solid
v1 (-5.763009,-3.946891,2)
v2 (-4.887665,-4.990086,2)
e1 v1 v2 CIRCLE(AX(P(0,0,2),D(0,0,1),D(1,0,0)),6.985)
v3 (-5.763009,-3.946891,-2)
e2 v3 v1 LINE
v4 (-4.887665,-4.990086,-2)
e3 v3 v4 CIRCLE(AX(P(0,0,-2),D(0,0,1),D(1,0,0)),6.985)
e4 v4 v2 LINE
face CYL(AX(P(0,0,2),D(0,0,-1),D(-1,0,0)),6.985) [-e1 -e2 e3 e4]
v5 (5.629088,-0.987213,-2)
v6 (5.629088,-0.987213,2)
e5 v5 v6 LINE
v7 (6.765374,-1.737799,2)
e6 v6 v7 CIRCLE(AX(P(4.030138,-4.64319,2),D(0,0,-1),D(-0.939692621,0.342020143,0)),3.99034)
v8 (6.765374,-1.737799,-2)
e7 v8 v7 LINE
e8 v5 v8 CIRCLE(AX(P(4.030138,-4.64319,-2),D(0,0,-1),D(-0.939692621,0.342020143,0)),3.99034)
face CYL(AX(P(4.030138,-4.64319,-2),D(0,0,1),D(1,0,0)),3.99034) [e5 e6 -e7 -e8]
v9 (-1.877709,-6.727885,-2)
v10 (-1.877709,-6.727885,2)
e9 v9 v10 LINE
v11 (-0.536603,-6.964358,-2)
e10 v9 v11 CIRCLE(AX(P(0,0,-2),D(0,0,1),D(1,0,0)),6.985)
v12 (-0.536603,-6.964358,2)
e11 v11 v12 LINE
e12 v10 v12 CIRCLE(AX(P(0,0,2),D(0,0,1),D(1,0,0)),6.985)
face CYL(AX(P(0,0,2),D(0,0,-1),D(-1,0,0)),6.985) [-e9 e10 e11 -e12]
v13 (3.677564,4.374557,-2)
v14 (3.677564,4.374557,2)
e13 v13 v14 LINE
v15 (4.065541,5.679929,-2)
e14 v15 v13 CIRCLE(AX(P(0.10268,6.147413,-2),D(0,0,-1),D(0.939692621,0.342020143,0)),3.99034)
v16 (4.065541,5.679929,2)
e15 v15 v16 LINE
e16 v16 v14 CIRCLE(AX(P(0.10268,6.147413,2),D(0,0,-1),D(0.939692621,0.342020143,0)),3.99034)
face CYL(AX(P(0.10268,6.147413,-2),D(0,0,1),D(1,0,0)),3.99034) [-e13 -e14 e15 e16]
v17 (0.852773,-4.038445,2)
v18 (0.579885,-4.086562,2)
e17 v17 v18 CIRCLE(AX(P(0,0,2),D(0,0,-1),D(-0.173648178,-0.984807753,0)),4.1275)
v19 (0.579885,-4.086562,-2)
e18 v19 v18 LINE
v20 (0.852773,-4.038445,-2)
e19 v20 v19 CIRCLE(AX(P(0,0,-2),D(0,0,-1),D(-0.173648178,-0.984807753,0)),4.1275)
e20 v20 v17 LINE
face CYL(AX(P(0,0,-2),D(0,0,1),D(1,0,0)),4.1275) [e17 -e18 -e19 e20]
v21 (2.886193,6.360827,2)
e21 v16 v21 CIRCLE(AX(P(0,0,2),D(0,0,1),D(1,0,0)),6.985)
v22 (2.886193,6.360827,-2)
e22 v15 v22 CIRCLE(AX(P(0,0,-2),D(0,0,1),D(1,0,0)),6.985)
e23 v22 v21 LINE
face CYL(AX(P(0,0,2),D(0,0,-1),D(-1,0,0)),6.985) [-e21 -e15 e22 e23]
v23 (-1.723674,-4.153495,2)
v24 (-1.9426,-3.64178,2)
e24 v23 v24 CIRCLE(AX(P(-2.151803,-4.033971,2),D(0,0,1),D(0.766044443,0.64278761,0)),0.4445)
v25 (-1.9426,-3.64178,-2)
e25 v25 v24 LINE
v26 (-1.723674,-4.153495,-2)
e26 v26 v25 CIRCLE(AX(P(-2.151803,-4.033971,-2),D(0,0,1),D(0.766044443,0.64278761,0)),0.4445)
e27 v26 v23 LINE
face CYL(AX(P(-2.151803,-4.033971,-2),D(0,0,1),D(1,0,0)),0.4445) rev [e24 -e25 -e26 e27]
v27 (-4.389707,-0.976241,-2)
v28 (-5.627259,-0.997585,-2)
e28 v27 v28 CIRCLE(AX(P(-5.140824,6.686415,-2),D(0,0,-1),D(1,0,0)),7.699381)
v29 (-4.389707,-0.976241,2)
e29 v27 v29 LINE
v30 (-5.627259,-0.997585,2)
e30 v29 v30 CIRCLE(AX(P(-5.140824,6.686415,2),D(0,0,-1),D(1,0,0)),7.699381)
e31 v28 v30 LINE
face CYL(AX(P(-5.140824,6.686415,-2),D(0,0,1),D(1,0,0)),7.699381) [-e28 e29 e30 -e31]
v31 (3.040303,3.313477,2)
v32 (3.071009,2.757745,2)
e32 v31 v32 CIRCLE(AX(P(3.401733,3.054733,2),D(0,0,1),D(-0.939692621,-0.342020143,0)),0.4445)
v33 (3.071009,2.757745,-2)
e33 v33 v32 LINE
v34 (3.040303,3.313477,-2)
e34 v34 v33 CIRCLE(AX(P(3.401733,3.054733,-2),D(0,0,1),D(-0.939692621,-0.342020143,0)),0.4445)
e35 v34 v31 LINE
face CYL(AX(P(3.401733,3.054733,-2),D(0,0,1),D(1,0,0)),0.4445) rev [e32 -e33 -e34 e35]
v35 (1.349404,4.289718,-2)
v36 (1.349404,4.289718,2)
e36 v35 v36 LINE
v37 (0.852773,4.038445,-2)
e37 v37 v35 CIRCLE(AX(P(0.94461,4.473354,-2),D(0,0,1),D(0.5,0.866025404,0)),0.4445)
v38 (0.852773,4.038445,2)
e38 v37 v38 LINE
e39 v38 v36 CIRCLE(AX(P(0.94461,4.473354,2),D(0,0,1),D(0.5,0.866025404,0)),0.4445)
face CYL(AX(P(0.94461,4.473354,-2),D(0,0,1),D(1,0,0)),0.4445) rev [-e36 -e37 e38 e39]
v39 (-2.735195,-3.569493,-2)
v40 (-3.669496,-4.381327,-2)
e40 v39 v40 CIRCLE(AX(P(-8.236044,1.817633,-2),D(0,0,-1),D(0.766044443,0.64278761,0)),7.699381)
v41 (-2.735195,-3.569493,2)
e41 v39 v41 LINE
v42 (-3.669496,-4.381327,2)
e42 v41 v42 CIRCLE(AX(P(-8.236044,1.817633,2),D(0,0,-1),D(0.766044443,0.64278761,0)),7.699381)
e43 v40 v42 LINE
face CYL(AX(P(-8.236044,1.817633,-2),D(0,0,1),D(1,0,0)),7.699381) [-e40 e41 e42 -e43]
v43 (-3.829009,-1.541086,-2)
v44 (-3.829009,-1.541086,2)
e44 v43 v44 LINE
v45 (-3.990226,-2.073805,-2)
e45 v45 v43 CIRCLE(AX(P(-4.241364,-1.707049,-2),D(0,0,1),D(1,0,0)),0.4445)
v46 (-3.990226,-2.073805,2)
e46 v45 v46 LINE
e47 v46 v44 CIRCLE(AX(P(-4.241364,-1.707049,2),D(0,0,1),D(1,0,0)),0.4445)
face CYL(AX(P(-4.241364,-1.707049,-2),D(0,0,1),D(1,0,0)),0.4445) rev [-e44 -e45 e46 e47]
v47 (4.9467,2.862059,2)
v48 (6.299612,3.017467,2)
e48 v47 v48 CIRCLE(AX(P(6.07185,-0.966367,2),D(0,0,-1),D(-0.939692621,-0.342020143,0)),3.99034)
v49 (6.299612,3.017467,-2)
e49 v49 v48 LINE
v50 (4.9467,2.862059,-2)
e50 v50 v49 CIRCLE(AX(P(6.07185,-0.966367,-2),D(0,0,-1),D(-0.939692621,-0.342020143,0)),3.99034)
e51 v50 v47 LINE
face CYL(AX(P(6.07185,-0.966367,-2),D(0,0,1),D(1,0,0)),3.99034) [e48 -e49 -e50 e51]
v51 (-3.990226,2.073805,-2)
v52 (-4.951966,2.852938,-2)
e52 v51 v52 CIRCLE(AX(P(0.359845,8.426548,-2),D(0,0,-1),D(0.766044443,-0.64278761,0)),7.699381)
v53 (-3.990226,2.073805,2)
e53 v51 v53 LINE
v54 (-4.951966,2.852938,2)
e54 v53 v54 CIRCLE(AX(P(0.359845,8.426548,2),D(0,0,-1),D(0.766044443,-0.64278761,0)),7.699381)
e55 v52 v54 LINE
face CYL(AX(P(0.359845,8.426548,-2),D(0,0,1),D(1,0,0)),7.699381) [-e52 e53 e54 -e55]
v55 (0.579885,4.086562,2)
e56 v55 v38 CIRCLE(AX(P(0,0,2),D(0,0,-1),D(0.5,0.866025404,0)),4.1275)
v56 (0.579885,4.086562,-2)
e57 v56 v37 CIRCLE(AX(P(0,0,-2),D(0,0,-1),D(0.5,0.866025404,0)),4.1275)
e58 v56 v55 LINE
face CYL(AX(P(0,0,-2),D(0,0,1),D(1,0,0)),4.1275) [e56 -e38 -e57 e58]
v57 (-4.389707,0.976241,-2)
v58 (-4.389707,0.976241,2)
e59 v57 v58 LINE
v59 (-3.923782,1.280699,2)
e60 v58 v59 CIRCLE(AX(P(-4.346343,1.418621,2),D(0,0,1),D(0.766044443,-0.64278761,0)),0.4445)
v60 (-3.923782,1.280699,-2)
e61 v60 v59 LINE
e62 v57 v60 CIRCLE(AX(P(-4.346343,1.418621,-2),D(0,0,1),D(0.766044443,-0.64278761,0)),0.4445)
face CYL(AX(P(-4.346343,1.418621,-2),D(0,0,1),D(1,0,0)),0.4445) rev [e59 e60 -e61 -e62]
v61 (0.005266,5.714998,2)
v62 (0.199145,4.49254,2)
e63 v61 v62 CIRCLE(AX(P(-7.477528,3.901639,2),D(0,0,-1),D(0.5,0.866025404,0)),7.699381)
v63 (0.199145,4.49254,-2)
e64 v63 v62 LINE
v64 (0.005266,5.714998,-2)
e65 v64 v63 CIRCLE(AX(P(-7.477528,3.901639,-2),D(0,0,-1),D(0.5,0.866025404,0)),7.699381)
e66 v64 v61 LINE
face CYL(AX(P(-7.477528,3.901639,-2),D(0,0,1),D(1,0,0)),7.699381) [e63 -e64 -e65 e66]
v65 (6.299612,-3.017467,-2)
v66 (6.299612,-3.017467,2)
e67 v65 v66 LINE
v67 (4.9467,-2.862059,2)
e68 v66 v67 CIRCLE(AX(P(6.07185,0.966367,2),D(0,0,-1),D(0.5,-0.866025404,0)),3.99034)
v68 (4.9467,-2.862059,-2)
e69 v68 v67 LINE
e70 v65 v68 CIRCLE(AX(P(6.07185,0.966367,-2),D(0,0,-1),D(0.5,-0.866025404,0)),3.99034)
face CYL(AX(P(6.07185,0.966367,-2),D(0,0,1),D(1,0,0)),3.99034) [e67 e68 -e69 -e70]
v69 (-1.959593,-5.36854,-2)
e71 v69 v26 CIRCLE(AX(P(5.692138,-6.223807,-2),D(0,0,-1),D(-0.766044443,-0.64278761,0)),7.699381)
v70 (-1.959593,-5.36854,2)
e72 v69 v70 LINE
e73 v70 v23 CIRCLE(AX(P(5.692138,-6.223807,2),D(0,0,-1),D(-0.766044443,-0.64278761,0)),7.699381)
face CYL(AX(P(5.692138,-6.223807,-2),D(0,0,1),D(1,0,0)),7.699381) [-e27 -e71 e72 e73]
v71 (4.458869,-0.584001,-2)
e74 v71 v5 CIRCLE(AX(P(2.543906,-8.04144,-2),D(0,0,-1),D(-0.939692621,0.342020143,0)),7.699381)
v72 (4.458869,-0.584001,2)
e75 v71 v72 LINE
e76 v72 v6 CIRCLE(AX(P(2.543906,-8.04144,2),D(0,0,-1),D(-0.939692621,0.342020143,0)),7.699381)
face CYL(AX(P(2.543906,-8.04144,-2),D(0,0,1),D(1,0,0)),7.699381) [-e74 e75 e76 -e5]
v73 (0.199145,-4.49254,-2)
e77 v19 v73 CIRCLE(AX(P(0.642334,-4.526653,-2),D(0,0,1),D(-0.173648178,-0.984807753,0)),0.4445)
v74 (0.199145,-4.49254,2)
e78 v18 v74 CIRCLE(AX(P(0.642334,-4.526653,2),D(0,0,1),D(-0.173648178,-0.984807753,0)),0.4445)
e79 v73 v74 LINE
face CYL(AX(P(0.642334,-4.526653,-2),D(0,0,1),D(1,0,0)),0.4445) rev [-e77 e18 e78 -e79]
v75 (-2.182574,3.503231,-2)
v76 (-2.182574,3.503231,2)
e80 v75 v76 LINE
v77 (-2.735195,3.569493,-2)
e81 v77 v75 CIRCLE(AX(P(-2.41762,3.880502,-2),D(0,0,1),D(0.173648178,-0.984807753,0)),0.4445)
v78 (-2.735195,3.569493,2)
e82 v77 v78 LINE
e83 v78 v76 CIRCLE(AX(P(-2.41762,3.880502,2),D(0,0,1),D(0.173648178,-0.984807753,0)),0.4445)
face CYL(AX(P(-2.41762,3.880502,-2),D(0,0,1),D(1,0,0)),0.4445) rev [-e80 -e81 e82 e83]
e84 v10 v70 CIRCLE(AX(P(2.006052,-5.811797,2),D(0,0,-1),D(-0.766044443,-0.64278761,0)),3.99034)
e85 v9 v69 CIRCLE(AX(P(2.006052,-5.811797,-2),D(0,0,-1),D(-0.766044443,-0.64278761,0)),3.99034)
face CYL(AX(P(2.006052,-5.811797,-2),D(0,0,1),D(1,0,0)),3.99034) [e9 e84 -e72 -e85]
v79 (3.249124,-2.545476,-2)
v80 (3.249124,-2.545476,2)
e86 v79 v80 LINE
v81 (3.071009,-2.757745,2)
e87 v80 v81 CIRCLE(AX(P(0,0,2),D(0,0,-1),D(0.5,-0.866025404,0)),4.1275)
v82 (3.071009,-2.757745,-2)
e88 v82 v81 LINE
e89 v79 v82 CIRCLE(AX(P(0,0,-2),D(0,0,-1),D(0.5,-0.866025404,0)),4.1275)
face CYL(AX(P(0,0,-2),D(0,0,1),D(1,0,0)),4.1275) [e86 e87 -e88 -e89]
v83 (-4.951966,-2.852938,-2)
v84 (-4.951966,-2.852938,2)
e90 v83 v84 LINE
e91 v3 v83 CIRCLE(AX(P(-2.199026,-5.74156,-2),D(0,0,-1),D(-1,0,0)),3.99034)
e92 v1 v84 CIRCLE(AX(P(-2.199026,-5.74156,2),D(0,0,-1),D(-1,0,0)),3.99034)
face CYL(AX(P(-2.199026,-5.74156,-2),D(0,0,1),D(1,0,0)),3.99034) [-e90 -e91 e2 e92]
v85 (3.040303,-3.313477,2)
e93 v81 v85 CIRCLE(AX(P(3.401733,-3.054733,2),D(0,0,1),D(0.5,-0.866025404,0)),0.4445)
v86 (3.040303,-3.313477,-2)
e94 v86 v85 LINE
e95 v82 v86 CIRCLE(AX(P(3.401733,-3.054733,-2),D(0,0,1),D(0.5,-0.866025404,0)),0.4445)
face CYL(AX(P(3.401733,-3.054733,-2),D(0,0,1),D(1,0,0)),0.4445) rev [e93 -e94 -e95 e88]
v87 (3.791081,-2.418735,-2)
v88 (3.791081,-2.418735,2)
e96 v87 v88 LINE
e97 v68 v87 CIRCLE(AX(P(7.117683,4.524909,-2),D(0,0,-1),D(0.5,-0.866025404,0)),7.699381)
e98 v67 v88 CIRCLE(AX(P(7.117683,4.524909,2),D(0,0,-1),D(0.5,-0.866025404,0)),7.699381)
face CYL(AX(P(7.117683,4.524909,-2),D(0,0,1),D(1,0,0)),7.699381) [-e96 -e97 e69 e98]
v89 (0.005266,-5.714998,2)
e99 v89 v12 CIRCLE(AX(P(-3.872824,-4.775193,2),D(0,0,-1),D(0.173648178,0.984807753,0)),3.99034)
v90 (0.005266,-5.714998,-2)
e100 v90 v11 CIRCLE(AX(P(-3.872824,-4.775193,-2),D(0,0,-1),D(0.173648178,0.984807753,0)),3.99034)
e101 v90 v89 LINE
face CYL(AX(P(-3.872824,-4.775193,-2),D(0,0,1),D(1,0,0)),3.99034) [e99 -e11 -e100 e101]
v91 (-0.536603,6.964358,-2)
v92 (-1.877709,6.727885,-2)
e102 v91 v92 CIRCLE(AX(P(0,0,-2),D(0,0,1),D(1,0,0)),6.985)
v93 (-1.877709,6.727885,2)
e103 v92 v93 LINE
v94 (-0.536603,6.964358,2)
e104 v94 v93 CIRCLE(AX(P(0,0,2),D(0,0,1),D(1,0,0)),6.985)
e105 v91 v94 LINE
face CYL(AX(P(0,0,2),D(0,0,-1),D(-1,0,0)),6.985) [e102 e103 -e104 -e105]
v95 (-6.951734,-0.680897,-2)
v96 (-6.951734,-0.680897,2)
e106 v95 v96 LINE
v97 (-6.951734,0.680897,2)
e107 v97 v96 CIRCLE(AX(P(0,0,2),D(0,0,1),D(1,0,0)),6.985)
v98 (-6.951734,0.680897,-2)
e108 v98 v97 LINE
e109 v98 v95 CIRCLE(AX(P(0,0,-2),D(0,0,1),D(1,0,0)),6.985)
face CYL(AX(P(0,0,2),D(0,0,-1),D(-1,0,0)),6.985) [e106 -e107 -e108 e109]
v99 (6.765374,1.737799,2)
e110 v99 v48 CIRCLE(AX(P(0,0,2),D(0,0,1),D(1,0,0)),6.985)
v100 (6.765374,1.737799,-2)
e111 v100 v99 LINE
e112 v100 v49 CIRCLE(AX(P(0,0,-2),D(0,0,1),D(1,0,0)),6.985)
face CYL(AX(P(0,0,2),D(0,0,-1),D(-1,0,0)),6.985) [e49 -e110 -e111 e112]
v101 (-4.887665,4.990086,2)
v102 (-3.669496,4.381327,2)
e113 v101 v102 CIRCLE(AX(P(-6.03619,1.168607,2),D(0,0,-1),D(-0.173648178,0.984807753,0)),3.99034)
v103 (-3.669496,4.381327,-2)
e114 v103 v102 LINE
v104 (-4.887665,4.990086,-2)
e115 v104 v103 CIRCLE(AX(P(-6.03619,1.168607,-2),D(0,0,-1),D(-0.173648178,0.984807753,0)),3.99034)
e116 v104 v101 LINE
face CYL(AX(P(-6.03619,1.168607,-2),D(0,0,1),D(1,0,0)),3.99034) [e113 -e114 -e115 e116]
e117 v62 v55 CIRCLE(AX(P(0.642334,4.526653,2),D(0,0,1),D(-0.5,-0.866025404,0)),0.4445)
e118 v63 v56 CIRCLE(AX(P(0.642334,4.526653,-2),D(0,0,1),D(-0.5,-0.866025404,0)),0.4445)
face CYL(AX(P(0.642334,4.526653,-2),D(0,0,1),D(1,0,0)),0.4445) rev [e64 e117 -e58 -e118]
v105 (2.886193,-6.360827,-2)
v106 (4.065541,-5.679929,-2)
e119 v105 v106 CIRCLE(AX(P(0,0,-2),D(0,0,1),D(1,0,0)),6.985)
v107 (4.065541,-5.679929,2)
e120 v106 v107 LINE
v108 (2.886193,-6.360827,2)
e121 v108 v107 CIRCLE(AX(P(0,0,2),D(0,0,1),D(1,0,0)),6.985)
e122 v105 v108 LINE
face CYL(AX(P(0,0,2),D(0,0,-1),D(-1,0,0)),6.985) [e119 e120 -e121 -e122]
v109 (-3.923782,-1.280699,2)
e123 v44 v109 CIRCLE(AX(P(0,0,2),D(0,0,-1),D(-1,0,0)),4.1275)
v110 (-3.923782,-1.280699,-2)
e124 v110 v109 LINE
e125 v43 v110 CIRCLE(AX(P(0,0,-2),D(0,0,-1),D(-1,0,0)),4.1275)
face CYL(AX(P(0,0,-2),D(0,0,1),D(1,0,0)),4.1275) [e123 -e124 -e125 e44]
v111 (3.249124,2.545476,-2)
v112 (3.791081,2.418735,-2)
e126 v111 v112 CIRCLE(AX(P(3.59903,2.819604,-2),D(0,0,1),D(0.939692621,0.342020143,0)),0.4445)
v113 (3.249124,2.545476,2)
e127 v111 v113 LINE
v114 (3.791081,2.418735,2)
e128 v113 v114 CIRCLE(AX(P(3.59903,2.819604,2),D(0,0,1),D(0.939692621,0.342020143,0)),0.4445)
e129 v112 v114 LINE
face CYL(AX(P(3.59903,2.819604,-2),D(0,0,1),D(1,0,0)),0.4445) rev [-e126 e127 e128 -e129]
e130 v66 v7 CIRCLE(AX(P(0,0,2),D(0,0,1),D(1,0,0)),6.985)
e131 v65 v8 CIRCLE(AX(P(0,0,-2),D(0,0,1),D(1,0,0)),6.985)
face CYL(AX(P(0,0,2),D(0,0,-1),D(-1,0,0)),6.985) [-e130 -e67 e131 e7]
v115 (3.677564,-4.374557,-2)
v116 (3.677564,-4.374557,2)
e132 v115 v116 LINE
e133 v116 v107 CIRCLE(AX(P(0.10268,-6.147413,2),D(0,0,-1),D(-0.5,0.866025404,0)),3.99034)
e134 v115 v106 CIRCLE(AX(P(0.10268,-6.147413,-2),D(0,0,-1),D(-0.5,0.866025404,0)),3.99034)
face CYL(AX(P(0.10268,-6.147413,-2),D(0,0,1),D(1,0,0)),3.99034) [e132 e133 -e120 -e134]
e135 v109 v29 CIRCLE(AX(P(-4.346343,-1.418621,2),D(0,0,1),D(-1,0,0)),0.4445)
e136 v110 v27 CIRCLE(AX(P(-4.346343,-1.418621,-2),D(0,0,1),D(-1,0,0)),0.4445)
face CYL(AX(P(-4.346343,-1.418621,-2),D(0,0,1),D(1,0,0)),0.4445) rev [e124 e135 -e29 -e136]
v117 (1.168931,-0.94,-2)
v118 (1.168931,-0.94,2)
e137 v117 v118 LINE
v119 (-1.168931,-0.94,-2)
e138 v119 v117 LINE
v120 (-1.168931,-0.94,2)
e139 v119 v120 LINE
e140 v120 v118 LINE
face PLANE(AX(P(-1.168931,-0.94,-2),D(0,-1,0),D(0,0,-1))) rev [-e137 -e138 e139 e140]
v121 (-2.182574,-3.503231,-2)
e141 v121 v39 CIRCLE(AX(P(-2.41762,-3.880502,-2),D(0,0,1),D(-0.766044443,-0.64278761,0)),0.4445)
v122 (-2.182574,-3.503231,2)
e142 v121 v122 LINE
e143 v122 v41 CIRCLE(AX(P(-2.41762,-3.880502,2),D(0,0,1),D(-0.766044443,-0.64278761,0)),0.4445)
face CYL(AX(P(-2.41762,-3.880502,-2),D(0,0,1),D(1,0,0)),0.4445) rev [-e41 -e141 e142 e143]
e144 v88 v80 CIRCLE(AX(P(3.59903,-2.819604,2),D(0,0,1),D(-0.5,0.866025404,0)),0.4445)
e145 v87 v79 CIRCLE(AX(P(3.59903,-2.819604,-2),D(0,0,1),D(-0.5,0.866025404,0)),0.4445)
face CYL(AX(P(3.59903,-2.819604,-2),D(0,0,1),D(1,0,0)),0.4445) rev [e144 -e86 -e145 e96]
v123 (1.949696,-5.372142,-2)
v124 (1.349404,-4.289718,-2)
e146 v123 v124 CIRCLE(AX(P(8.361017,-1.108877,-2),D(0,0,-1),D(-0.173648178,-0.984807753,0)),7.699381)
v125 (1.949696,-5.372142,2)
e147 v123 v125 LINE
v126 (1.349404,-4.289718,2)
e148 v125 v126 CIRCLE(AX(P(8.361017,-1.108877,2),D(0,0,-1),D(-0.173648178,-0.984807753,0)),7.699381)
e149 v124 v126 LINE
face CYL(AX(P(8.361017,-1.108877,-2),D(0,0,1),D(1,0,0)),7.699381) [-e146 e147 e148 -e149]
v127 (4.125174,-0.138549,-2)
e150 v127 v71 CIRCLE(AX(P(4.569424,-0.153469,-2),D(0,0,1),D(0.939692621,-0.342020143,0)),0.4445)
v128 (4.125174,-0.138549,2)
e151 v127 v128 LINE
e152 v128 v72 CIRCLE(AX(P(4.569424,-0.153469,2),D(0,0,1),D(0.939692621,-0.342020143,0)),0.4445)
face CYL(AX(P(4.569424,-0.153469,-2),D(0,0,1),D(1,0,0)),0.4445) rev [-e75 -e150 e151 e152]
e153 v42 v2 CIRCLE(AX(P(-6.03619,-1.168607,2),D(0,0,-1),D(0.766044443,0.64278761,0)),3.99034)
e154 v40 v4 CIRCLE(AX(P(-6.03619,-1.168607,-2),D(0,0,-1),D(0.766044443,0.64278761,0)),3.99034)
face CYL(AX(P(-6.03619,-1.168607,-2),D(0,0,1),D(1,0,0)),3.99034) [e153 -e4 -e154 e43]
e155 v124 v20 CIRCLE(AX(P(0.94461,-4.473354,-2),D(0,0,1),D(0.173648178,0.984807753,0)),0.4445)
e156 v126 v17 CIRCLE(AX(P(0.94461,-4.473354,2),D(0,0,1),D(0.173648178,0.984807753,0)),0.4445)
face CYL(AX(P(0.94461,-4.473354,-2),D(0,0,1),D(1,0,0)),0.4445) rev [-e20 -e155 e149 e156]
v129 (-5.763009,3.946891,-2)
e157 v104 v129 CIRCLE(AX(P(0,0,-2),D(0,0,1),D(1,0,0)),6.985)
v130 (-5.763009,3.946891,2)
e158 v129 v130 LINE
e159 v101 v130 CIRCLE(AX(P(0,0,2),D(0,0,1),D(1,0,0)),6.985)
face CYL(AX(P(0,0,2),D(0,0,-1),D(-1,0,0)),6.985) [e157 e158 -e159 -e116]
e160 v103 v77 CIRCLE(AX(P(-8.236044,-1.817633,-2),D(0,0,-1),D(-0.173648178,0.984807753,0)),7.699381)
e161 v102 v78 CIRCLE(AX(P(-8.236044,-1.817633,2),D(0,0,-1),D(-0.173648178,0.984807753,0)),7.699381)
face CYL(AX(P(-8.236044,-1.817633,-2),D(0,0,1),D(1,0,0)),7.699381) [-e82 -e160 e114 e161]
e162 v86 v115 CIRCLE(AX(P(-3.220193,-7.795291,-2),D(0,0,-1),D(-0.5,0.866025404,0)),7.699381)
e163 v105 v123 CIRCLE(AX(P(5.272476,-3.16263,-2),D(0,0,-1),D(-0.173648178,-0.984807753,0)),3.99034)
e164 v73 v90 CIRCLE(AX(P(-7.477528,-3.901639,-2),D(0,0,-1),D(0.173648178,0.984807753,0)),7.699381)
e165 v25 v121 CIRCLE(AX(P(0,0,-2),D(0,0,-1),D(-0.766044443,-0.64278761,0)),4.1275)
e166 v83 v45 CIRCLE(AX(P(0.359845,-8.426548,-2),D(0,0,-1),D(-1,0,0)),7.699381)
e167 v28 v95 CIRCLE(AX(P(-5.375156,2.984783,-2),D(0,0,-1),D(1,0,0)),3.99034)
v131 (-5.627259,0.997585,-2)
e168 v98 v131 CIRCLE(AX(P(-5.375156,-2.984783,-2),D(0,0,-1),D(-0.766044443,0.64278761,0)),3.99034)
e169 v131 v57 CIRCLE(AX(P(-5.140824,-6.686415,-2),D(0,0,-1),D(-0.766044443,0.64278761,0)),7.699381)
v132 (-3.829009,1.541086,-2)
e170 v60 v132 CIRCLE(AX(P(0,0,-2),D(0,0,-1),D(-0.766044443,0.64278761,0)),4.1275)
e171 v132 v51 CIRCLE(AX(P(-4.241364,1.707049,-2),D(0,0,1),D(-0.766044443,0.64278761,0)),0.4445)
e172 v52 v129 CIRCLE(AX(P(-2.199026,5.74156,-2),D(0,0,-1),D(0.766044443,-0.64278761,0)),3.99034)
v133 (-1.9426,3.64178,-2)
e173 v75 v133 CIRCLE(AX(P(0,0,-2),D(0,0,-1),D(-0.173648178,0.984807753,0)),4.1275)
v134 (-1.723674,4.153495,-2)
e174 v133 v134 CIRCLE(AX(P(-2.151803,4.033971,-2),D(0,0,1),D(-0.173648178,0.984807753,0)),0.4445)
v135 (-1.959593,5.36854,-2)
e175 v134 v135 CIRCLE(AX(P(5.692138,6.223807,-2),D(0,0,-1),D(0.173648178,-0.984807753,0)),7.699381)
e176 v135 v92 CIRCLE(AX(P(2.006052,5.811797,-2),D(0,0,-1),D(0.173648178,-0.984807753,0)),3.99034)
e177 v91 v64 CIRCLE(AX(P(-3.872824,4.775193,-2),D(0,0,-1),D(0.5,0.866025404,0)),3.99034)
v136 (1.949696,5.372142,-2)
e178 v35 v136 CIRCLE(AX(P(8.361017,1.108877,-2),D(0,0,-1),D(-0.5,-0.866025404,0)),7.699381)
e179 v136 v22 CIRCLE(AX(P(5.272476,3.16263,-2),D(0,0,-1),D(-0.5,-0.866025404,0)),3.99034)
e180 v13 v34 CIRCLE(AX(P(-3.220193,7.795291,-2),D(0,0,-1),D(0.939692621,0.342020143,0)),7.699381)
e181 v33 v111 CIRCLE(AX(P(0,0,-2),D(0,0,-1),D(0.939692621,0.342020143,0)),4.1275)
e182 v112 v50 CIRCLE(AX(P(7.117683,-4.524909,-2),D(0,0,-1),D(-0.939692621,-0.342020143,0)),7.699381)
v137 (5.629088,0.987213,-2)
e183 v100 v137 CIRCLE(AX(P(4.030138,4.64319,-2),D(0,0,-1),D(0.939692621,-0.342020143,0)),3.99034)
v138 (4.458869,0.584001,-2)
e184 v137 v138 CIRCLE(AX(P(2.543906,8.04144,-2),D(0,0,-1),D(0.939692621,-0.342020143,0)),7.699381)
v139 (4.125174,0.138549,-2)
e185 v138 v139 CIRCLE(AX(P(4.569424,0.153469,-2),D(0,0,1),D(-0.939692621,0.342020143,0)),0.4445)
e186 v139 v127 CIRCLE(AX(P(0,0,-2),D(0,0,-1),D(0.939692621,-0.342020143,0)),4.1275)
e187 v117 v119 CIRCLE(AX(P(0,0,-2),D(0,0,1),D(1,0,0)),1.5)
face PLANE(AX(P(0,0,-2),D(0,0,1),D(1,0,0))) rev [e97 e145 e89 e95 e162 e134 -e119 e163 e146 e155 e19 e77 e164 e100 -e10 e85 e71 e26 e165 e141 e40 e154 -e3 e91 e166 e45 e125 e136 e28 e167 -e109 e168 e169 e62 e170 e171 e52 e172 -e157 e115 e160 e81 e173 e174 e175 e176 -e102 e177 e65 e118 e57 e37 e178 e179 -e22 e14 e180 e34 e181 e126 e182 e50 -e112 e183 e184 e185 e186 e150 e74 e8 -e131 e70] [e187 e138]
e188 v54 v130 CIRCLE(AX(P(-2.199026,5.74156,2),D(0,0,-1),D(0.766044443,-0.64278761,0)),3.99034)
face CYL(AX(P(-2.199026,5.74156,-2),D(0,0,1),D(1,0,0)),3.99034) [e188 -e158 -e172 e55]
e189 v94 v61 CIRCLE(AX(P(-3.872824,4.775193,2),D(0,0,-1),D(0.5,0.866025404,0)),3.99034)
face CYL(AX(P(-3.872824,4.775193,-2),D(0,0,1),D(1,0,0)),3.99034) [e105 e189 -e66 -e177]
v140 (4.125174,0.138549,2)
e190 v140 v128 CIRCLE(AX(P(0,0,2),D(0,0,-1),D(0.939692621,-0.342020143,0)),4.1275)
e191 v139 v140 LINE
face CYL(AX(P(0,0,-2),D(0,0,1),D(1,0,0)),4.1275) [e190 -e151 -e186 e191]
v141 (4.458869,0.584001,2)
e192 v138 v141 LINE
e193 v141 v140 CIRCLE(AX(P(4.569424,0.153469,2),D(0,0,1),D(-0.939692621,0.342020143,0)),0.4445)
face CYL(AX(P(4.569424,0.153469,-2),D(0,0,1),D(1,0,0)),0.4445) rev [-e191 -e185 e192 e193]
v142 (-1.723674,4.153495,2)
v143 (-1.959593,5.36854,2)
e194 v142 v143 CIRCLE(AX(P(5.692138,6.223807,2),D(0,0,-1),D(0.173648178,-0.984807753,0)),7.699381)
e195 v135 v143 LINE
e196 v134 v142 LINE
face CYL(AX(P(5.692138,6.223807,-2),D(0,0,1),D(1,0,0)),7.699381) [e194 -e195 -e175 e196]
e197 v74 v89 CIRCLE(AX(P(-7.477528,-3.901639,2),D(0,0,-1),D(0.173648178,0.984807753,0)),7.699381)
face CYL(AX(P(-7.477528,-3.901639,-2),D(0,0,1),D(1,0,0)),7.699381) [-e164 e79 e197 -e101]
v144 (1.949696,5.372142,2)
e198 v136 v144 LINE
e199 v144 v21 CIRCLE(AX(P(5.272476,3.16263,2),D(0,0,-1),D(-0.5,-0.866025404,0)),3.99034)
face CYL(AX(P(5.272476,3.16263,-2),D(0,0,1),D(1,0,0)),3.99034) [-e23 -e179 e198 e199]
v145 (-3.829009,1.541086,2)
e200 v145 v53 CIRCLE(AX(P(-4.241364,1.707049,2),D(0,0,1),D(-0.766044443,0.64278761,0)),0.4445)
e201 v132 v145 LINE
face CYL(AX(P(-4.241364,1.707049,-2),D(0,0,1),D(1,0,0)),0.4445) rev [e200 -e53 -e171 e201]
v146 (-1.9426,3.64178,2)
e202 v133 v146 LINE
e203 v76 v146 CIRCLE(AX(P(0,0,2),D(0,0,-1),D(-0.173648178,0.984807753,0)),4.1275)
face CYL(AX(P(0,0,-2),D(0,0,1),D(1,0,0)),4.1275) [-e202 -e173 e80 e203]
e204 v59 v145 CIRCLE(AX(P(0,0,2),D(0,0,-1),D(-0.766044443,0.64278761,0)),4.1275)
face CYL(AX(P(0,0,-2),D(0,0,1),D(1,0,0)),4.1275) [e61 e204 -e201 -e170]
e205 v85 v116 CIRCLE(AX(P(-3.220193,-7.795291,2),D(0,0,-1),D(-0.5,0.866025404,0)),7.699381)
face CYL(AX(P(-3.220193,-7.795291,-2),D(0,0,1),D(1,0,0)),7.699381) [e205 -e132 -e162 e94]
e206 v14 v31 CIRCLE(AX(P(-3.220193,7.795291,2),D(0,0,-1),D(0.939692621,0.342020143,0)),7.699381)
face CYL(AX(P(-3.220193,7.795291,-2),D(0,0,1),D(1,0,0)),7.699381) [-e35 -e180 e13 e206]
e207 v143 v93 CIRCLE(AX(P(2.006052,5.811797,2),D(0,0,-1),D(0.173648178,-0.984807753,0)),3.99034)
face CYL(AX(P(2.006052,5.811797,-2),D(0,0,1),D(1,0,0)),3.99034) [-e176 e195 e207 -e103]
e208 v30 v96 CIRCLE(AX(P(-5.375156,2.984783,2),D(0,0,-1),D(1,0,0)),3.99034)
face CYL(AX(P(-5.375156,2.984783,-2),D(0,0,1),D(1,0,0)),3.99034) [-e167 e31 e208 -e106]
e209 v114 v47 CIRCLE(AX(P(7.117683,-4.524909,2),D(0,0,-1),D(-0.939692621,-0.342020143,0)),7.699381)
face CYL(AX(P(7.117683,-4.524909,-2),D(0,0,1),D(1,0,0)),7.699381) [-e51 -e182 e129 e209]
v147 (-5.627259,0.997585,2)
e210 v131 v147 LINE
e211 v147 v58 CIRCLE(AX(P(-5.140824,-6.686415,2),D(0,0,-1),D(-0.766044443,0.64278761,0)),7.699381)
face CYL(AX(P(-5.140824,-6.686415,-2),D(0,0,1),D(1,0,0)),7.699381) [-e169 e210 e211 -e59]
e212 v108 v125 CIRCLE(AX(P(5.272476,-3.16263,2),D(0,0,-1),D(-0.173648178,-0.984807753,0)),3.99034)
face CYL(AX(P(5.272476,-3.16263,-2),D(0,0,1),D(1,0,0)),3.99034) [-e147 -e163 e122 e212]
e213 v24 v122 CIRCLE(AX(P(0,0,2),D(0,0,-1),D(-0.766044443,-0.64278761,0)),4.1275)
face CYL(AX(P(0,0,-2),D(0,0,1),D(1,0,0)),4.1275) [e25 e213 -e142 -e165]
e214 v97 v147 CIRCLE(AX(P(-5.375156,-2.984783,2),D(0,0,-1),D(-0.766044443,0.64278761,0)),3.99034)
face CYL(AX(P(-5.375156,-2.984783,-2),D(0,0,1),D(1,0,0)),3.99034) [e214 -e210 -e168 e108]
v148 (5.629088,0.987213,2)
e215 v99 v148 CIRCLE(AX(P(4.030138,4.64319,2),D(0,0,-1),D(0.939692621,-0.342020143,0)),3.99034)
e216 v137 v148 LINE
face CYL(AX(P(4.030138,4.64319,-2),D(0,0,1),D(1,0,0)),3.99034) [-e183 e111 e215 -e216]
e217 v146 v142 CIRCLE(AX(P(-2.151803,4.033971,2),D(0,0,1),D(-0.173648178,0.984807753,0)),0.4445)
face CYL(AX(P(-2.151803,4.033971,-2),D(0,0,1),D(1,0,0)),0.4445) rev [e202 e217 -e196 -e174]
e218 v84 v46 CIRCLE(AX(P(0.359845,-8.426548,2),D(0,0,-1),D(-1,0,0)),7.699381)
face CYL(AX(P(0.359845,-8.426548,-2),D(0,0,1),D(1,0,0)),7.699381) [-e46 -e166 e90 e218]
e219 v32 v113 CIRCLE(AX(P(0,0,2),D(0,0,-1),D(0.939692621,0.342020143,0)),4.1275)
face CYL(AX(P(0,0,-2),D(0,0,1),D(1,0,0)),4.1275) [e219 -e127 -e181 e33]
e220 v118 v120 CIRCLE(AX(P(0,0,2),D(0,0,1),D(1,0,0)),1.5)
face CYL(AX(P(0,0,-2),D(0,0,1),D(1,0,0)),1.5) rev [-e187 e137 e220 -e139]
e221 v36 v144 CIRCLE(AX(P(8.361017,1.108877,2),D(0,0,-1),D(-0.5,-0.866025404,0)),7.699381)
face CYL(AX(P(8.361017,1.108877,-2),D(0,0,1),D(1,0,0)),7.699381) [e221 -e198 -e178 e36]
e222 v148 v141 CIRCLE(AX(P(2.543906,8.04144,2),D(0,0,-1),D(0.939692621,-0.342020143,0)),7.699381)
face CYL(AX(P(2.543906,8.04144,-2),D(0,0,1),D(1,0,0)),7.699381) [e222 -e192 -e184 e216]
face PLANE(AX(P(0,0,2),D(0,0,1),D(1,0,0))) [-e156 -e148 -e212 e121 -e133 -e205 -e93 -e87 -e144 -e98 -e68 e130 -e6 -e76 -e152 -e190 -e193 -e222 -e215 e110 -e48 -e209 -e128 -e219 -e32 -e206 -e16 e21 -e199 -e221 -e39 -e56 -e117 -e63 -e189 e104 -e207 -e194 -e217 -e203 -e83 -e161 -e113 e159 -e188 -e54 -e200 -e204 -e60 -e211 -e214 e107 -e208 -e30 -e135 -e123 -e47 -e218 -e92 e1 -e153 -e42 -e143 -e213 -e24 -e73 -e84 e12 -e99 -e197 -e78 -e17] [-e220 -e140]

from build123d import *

# Parameters (mm, degrees)
SKETCH1_R                = 6.985
BLANK_DISK_DEPTH         = 2.000000064
GEAR_TOOTH_CUT_DEPTH     = 11.657412961
GEAR_TEETH_REVOLVE_COUNT = 9
SKETCH4_R                = 0.75
HUB_EXTRUDE_DEPTH        = 0.635
HEX_BORE_CUT_DEPTH       = 11.643895353
HEX_BORE_CUT_DEPTH_BACK  = 11.643895353


with BuildPart() as part:
    # Sketch1 → BLANK DISK (new, symmetric)
    with BuildSketch(Plane.XY):
        Circle(SKETCH1_R)
    extrude(amount=BLANK_DISK_DEPTH, both=True)

    # Sketch2 → GEAR TOOTH CUT (cut, through all)
    with BuildSketch(Plane.XY.offset(2.000000064)):
        with BuildLine():
            ThreePointArc((-5.763009467, -3.946890786), (-6.563752956, -2.389010701), (-6.951733872, -0.680897326))
            ThreePointArc((-6.951733872, -0.680897326), (-6.303106227, -0.89616004), (-5.627259472, -0.997585))
            ThreePointArc((-5.627259472, -0.997585), (-5.00805343, -1.01182167), (-4.389706578, -0.976241119))
            ThreePointArc((-4.389706578, -0.976241119), (-4.103194142, -1.046520353), (-3.923782009, -1.280699416))
            ThreePointArc((-3.923782009, -1.280699416), (-3.878581292, -1.411688142), (-3.82900912, -1.541085788))
            ThreePointArc((-3.82900912, -1.541085788), (-3.815919388, -1.835801253), (-3.990226026, -2.073804914))
            ThreePointArc((-3.990226026, -2.073804914), (-4.486777934, -2.444014326), (-4.951966126, -2.852938219))
            ThreePointArc((-4.951966126, -2.852938219), (-5.404500069, -3.365060167), (-5.763009467, -3.946890786))
        make_face()
    gear_tooth_cut = extrude(amount=-GEAR_TOOTH_CUT_DEPTH, mode=Mode.SUBTRACT)

    # GEAR TEETH REVOLVE: GEAR TOOTH CUT ×9 about axis
    gear_teeth_revolve_axis = Axis((0, 0, 50), (0, 0, -1))
    for i in range(1, GEAR_TEETH_REVOLVE_COUNT):
        add(gear_tooth_cut.rotate(gear_teeth_revolve_axis, i * 360 / GEAR_TEETH_REVOLVE_COUNT), mode=Mode.SUBTRACT)

    # Sketch4 → Hub Extrude (add)
    with BuildSketch(Plane.XY.offset(2.000000064)):
        Circle(SKETCH4_R)
    extrude(amount=HUB_EXTRUDE_DEPTH)

    # Sketch3 → HEX BORE CUT (cut, two sides: drawn at the far end of the back side and taken through both)
    with BuildSketch(Plane.XY.offset(2.000000064).offset(-HEX_BORE_CUT_DEPTH_BACK)):
        with BuildLine():
            Line((-1.168931136, -0.94), (1.168931136, -0.94))
            ThreePointArc((1.168931136, -0.94), (0, 1.5), (-1.168931136, -0.94))
        make_face()
    extrude(amount=HEX_BORE_CUT_DEPTH + HEX_BORE_CUT_DEPTH_BACK, mode=Mode.SUBTRACT)


solid = part.part
